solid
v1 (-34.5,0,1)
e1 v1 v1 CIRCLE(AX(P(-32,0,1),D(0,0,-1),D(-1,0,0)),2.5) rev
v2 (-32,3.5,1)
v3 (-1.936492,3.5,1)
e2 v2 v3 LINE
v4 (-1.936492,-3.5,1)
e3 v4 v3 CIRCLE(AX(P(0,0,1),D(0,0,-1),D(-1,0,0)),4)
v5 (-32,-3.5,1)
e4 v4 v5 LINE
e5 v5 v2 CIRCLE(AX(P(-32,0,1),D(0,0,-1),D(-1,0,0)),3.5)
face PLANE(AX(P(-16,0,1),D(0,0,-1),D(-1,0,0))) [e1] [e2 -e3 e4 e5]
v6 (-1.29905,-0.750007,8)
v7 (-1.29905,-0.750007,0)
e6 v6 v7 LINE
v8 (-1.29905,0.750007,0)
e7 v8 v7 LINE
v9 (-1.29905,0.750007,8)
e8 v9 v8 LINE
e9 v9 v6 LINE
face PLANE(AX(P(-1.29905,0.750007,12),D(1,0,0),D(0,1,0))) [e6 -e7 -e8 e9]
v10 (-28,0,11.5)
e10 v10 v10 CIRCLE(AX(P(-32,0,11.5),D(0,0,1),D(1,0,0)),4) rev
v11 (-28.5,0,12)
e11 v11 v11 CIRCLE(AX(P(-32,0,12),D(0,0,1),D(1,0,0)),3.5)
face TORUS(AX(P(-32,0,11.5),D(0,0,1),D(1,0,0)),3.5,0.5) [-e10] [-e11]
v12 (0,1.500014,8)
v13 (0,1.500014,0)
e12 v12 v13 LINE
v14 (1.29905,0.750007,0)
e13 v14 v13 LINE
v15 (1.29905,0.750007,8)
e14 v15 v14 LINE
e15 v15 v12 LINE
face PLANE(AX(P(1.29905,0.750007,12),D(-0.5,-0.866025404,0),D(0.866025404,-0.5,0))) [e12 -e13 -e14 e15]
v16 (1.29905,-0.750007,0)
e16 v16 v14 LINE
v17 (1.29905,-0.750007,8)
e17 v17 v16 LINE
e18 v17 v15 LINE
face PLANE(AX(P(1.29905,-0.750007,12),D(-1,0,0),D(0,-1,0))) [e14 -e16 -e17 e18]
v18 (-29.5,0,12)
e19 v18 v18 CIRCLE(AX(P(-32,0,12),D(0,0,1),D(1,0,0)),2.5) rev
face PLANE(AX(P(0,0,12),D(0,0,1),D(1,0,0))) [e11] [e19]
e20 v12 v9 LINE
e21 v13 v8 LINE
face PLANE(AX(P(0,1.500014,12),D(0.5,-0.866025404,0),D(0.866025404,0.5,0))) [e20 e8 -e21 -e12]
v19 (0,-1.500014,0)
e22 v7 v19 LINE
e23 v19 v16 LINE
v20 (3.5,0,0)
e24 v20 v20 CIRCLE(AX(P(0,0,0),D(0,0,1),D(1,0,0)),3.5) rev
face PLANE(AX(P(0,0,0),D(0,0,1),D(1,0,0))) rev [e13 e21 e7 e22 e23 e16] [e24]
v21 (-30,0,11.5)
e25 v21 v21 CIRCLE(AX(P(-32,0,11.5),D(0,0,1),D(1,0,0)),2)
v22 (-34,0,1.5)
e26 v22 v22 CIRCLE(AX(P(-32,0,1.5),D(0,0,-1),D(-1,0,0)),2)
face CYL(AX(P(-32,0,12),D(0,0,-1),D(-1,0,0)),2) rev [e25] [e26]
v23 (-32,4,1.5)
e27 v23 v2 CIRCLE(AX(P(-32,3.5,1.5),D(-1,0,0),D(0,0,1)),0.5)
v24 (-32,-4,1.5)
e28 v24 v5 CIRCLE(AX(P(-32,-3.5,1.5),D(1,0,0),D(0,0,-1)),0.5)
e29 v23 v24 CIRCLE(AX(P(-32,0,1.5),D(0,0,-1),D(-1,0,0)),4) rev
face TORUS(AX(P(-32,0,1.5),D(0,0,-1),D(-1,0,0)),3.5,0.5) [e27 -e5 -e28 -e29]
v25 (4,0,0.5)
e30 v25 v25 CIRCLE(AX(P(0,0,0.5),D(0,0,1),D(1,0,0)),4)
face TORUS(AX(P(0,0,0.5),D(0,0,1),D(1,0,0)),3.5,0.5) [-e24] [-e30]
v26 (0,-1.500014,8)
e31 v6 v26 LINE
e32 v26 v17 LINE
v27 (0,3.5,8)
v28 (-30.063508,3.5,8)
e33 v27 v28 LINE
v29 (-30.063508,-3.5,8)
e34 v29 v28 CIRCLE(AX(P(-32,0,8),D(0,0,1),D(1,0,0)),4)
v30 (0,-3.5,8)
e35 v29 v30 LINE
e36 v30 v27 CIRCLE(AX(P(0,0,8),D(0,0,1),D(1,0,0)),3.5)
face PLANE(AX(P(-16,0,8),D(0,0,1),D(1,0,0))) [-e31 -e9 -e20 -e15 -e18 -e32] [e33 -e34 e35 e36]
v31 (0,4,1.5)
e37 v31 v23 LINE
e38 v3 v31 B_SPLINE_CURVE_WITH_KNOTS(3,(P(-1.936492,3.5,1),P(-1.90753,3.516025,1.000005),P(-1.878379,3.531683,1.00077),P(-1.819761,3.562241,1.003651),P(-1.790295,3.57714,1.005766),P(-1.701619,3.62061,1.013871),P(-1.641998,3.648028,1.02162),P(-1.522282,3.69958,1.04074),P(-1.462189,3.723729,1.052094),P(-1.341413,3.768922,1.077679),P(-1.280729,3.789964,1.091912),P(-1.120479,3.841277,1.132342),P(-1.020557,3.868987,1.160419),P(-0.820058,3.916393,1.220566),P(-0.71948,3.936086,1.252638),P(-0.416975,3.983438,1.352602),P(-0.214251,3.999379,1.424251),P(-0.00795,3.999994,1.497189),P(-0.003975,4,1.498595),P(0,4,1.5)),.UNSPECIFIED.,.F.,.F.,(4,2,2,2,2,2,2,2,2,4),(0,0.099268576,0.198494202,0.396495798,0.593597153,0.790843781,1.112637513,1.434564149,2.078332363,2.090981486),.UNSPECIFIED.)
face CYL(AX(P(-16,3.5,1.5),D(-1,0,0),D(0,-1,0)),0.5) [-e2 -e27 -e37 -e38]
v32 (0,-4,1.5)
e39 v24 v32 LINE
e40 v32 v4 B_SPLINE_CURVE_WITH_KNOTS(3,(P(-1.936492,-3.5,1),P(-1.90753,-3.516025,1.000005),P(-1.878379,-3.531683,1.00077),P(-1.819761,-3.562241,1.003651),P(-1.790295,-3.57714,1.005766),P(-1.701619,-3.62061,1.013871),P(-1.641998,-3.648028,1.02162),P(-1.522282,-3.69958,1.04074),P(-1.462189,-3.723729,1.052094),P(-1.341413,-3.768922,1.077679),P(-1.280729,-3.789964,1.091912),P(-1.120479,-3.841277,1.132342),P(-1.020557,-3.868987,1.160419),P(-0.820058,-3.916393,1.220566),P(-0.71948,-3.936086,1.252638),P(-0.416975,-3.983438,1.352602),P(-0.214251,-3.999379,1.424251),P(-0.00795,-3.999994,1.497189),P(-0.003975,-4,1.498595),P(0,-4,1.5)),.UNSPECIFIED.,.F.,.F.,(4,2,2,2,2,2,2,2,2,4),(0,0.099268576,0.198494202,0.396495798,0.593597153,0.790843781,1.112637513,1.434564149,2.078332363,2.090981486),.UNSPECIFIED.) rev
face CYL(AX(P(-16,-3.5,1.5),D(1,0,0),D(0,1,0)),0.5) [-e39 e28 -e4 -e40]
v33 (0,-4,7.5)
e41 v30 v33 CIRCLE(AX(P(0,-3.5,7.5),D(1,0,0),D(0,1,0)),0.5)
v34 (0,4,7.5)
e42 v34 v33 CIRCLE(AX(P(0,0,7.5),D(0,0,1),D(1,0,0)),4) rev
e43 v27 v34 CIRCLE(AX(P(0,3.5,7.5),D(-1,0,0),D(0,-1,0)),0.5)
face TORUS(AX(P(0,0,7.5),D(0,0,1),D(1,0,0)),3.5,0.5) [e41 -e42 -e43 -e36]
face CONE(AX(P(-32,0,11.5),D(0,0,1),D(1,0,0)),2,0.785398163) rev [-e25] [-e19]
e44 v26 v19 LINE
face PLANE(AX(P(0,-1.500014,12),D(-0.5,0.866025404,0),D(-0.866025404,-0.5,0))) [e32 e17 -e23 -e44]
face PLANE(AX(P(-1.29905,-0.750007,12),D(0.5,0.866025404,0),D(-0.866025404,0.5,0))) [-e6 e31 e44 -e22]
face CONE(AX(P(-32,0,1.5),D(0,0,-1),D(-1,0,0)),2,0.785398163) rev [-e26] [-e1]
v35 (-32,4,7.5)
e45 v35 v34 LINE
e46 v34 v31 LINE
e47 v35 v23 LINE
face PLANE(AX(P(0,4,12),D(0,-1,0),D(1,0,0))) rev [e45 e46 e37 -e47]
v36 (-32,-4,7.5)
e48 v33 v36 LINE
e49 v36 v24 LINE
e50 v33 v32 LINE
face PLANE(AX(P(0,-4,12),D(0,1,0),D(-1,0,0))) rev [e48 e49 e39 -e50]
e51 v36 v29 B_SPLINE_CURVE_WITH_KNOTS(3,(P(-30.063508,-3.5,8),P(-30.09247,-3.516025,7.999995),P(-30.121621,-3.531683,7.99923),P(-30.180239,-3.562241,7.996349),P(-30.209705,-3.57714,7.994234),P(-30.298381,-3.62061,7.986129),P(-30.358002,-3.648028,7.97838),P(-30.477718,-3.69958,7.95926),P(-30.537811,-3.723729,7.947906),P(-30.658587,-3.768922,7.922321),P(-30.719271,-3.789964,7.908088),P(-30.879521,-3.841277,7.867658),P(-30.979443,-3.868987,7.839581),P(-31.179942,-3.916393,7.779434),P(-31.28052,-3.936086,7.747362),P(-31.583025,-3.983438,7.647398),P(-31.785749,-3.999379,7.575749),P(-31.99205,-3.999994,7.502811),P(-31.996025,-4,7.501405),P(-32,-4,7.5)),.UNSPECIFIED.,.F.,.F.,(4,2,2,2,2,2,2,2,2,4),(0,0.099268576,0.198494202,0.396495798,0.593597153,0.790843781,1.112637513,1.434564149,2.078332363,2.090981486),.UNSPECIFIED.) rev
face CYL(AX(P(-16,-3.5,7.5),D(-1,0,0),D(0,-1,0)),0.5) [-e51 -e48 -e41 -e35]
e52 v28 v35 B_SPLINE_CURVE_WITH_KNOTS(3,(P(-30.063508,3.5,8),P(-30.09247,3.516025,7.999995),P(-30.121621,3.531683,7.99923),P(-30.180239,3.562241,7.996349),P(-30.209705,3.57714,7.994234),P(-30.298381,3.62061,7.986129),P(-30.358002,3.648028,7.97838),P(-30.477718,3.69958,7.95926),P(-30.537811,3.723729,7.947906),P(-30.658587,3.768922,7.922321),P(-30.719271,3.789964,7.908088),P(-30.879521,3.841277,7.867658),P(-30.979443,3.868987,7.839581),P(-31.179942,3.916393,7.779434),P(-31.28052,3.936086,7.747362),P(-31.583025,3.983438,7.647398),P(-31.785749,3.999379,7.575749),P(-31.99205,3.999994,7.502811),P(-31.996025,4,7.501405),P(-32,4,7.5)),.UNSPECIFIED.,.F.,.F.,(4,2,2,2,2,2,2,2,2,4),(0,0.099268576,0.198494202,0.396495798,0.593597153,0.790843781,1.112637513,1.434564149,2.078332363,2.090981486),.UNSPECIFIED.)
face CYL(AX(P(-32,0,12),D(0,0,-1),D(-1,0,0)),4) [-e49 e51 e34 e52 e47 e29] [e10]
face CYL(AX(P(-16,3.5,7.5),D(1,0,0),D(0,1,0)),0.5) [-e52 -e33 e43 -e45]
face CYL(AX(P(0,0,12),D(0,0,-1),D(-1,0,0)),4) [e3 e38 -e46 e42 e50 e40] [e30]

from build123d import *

# Parameters (mm, degrees)
ESBO_O1_R                = 2
RESSALTO_EXTRUS_O1_DEPTH = 12
ESBO_O2_OUTSIDE_W        = 50.504
ESBO_O2_OUTSIDE_H        = 18.504
ESBO_O2_OUTSIDE_R        = 4
CORTE_EXTRUS_O1_DEPTH    = 1
ESBO_O3_OUTSIDE_W        = 50.504
ESBO_O3_OUTSIDE_H        = 18.504
ESBO_O3_OUTSIDE_R        = 4
CORTE_EXTRUS_O2_DEPTH    = 4
FILETE1_R                = 0.5
CHANFRO1_SIZE            = 0.5


with BuildPart() as part:
    # Esboço1 → Ressalto-extrusão1 (new body)
    with BuildSketch(Plane.XY):
        with BuildLine():
            Line((0, -4), (-32, -4))
            ThreePointArc((-32, -4), (-36, 0), (-32, 4))
            Line((-32, 4), (0, 4))
            ThreePointArc((0, 4), (4, 0), (0, -4))
        make_face()
        with Locations((-32, 0)):
            Circle(ESBO_O1_R, mode=Mode.SUBTRACT)
        Polygon((0, 1.500013734), (-1.29905, 0.750006867), (-1.29905, -0.750006867), (0, -1.500013734), (1.29905, -0.750006867), (1.29905, 0.750006867), align=None, mode=Mode.SUBTRACT)
    extrude(amount=RESSALTO_EXTRUS_O1_DEPTH)

    # Esboço2 outside → Corte-extrusão1 (cut)
    with BuildSketch(Plane(origin=(0, 0, 0), x_dir=(-1, 0, 0), z_dir=(0, 0, -1))):
        with Locations((16, 0)):
            Rectangle(ESBO_O2_OUTSIDE_W, ESBO_O2_OUTSIDE_H)
        with Locations(Location((0, 0, 0), (0, 0, 90))):
            Circle(ESBO_O2_OUTSIDE_R, mode=Mode.SUBTRACT)
    extrude(amount=-CORTE_EXTRUS_O1_DEPTH, mode=Mode.SUBTRACT)

    # Esboço3 outside → Corte-extrusão2 (cut)
    with BuildSketch(Plane.XY.offset(12)):
        with Locations((-16, 0)):
            Rectangle(ESBO_O3_OUTSIDE_W, ESBO_O3_OUTSIDE_H)
        with Locations(Location((-32, 0, 0), (0, 0, 90))):
            Circle(ESBO_O3_OUTSIDE_R, mode=Mode.SUBTRACT)
    extrude(amount=-CORTE_EXTRUS_O2_DEPTH, mode=Mode.SUBTRACT)

    # Filete1
    # the kernel refuses this fillet: 0.5 mm, written as the material it takes off along each edge
    with BuildSketch(Plane(origin=(-32, 0, 12), x_dir=(0, -1, 0), z_dir=(1, 0, 0))) as filete1_piece_1:
        with BuildLine():
            CenterArc((4 - FILETE1_R, FILETE1_R), FILETE1_R, 270, 90)
            Line((4, FILETE1_R), (4, 0))
            Line((4, 0), (4 - FILETE1_R, 0))
        make_face()
    revolve(axis=Axis((-32, 0, 12), (0, 0, -1)), mode=Mode.SUBTRACT)
    with BuildSketch(Plane(origin=(-32, 0, 1), x_dir=(0, -1, 0), z_dir=(1, 0, 0))) as filete1_piece_2:
        with BuildLine():
            CenterArc((4 - FILETE1_R, -FILETE1_R), FILETE1_R, 0, 90)
            Line((4, -FILETE1_R), (4, 0))
            Line((4, 0), (4 - FILETE1_R, 0))
        make_face()
    revolve(axis=Axis((-32, 0, 1), (0, 0, -1)), revolution_arc=180, mode=Mode.SUBTRACT)
    with BuildSketch(Plane(origin=(1.25, 4, 1), x_dir=(0, -1, 0), z_dir=(-1, 0, 0))) as filete1_piece_3_section:
        with BuildLine():
            CenterArc((FILETE1_R, FILETE1_R), FILETE1_R, 180, 90)
            Line((0, FILETE1_R), (0, 0))
            Line((0, 0), (FILETE1_R, 0))
        make_face()
    filete1_piece_3 = extrude(amount=33.25, mode=Mode.PRIVATE)
    filete1_piece_3 = filete1_piece_3 - Plane(origin=(0, 0, 1.115122713), x_dir=(0, 1, 0), z_dir=(0, 0, -1)) * Cylinder(4, 69, mode=Mode.PRIVATE)
    add(filete1_piece_3, mode=Mode.SUBTRACT)
    with BuildSketch(Plane(origin=(-32, -4, 1), x_dir=(0, 0, 1), z_dir=(1, 0, 0))) as filete1_piece_4_section:
        with BuildLine():
            CenterArc((FILETE1_R, -FILETE1_R), FILETE1_R, 90, 90)
            Line((0, -FILETE1_R), (0, 0))
            Line((0, 0), (FILETE1_R, 0))
        make_face()
    filete1_piece_4 = extrude(amount=33.25, mode=Mode.PRIVATE)
    filete1_piece_4 = filete1_piece_4 - Plane(origin=(0, 0, 1.115122438), x_dir=(0, 1, 0), z_dir=(0, 0, -1)) * Cylinder(4, 69, mode=Mode.PRIVATE)
    add(filete1_piece_4, mode=Mode.SUBTRACT)
    with BuildSketch(Plane(origin=(0, 0, 0), x_dir=(0, 1, 0), z_dir=(1, 0, 0))) as filete1_piece_5:
        with BuildLine():
            CenterArc((4 - FILETE1_R, FILETE1_R), FILETE1_R, 270, 90)
            Line((4 - FILETE1_R, 0), (4, 0))
            Line((4, 0), (4, FILETE1_R))
        make_face()
    revolve(axis=Axis((0, 0, 0), (0, 0, 1)), mode=Mode.SUBTRACT)
    with BuildSketch(Plane(origin=(0, 0, 8), x_dir=(0, 1, 0), z_dir=(-1, 0, 0))) as filete1_piece_6:
        with BuildLine():
            CenterArc((4 - FILETE1_R, FILETE1_R), FILETE1_R, 270, 90)
            Line((4 - FILETE1_R, 0), (4, 0))
            Line((4, 0), (4, FILETE1_R))
        make_face()
    revolve(axis=Axis((0, 0, 8), (0, 0, -1)), revolution_arc=180, mode=Mode.SUBTRACT)
    with BuildSketch(Plane(origin=(-33.25, 4, 8), x_dir=(0, 0, -1), z_dir=(1, 0, 0))) as filete1_piece_7_section:
        with BuildLine():
            CenterArc((FILETE1_R, -FILETE1_R), FILETE1_R, 90, 90)
            Line((0, -FILETE1_R), (0, 0))
            Line((0, 0), (FILETE1_R, 0))
        make_face()
    filete1_piece_7 = extrude(amount=33.25, mode=Mode.PRIVATE)
    filete1_piece_7 = filete1_piece_7 - Plane(origin=(-32, 0, 7.884877562), x_dir=(0, -1, 0), z_dir=(0, 0, -1)) * Cylinder(4, 69, mode=Mode.PRIVATE)
    add(filete1_piece_7, mode=Mode.SUBTRACT)
    with BuildSketch(Plane(origin=(0, -4, 8), x_dir=(0, 0, -1), z_dir=(-1, 0, 0))) as filete1_piece_8_section:
        with BuildLine():
            CenterArc((FILETE1_R, -FILETE1_R), FILETE1_R, 90, 90)
            Line((0, -FILETE1_R), (0, 0))
            Line((0, 0), (FILETE1_R, 0))
        make_face()
    filete1_piece_8 = extrude(amount=33.25, mode=Mode.PRIVATE)
    filete1_piece_8 = filete1_piece_8 - Plane(origin=(-32, 0, 7.884877562), x_dir=(0, -1, 0), z_dir=(0, 0, -1)) * Cylinder(4, 69, mode=Mode.PRIVATE)
    add(filete1_piece_8, mode=Mode.SUBTRACT)

    # Chanfro1
    chanfro1_edges = [part.edges().sort_by_distance(p)[0] for p in [
        (-34, 0, 12),
        (-34, 0, 1),
    ]]
    chamfer(chanfro1_edges, length=CHANFRO1_SIZE)


solid = part.part
